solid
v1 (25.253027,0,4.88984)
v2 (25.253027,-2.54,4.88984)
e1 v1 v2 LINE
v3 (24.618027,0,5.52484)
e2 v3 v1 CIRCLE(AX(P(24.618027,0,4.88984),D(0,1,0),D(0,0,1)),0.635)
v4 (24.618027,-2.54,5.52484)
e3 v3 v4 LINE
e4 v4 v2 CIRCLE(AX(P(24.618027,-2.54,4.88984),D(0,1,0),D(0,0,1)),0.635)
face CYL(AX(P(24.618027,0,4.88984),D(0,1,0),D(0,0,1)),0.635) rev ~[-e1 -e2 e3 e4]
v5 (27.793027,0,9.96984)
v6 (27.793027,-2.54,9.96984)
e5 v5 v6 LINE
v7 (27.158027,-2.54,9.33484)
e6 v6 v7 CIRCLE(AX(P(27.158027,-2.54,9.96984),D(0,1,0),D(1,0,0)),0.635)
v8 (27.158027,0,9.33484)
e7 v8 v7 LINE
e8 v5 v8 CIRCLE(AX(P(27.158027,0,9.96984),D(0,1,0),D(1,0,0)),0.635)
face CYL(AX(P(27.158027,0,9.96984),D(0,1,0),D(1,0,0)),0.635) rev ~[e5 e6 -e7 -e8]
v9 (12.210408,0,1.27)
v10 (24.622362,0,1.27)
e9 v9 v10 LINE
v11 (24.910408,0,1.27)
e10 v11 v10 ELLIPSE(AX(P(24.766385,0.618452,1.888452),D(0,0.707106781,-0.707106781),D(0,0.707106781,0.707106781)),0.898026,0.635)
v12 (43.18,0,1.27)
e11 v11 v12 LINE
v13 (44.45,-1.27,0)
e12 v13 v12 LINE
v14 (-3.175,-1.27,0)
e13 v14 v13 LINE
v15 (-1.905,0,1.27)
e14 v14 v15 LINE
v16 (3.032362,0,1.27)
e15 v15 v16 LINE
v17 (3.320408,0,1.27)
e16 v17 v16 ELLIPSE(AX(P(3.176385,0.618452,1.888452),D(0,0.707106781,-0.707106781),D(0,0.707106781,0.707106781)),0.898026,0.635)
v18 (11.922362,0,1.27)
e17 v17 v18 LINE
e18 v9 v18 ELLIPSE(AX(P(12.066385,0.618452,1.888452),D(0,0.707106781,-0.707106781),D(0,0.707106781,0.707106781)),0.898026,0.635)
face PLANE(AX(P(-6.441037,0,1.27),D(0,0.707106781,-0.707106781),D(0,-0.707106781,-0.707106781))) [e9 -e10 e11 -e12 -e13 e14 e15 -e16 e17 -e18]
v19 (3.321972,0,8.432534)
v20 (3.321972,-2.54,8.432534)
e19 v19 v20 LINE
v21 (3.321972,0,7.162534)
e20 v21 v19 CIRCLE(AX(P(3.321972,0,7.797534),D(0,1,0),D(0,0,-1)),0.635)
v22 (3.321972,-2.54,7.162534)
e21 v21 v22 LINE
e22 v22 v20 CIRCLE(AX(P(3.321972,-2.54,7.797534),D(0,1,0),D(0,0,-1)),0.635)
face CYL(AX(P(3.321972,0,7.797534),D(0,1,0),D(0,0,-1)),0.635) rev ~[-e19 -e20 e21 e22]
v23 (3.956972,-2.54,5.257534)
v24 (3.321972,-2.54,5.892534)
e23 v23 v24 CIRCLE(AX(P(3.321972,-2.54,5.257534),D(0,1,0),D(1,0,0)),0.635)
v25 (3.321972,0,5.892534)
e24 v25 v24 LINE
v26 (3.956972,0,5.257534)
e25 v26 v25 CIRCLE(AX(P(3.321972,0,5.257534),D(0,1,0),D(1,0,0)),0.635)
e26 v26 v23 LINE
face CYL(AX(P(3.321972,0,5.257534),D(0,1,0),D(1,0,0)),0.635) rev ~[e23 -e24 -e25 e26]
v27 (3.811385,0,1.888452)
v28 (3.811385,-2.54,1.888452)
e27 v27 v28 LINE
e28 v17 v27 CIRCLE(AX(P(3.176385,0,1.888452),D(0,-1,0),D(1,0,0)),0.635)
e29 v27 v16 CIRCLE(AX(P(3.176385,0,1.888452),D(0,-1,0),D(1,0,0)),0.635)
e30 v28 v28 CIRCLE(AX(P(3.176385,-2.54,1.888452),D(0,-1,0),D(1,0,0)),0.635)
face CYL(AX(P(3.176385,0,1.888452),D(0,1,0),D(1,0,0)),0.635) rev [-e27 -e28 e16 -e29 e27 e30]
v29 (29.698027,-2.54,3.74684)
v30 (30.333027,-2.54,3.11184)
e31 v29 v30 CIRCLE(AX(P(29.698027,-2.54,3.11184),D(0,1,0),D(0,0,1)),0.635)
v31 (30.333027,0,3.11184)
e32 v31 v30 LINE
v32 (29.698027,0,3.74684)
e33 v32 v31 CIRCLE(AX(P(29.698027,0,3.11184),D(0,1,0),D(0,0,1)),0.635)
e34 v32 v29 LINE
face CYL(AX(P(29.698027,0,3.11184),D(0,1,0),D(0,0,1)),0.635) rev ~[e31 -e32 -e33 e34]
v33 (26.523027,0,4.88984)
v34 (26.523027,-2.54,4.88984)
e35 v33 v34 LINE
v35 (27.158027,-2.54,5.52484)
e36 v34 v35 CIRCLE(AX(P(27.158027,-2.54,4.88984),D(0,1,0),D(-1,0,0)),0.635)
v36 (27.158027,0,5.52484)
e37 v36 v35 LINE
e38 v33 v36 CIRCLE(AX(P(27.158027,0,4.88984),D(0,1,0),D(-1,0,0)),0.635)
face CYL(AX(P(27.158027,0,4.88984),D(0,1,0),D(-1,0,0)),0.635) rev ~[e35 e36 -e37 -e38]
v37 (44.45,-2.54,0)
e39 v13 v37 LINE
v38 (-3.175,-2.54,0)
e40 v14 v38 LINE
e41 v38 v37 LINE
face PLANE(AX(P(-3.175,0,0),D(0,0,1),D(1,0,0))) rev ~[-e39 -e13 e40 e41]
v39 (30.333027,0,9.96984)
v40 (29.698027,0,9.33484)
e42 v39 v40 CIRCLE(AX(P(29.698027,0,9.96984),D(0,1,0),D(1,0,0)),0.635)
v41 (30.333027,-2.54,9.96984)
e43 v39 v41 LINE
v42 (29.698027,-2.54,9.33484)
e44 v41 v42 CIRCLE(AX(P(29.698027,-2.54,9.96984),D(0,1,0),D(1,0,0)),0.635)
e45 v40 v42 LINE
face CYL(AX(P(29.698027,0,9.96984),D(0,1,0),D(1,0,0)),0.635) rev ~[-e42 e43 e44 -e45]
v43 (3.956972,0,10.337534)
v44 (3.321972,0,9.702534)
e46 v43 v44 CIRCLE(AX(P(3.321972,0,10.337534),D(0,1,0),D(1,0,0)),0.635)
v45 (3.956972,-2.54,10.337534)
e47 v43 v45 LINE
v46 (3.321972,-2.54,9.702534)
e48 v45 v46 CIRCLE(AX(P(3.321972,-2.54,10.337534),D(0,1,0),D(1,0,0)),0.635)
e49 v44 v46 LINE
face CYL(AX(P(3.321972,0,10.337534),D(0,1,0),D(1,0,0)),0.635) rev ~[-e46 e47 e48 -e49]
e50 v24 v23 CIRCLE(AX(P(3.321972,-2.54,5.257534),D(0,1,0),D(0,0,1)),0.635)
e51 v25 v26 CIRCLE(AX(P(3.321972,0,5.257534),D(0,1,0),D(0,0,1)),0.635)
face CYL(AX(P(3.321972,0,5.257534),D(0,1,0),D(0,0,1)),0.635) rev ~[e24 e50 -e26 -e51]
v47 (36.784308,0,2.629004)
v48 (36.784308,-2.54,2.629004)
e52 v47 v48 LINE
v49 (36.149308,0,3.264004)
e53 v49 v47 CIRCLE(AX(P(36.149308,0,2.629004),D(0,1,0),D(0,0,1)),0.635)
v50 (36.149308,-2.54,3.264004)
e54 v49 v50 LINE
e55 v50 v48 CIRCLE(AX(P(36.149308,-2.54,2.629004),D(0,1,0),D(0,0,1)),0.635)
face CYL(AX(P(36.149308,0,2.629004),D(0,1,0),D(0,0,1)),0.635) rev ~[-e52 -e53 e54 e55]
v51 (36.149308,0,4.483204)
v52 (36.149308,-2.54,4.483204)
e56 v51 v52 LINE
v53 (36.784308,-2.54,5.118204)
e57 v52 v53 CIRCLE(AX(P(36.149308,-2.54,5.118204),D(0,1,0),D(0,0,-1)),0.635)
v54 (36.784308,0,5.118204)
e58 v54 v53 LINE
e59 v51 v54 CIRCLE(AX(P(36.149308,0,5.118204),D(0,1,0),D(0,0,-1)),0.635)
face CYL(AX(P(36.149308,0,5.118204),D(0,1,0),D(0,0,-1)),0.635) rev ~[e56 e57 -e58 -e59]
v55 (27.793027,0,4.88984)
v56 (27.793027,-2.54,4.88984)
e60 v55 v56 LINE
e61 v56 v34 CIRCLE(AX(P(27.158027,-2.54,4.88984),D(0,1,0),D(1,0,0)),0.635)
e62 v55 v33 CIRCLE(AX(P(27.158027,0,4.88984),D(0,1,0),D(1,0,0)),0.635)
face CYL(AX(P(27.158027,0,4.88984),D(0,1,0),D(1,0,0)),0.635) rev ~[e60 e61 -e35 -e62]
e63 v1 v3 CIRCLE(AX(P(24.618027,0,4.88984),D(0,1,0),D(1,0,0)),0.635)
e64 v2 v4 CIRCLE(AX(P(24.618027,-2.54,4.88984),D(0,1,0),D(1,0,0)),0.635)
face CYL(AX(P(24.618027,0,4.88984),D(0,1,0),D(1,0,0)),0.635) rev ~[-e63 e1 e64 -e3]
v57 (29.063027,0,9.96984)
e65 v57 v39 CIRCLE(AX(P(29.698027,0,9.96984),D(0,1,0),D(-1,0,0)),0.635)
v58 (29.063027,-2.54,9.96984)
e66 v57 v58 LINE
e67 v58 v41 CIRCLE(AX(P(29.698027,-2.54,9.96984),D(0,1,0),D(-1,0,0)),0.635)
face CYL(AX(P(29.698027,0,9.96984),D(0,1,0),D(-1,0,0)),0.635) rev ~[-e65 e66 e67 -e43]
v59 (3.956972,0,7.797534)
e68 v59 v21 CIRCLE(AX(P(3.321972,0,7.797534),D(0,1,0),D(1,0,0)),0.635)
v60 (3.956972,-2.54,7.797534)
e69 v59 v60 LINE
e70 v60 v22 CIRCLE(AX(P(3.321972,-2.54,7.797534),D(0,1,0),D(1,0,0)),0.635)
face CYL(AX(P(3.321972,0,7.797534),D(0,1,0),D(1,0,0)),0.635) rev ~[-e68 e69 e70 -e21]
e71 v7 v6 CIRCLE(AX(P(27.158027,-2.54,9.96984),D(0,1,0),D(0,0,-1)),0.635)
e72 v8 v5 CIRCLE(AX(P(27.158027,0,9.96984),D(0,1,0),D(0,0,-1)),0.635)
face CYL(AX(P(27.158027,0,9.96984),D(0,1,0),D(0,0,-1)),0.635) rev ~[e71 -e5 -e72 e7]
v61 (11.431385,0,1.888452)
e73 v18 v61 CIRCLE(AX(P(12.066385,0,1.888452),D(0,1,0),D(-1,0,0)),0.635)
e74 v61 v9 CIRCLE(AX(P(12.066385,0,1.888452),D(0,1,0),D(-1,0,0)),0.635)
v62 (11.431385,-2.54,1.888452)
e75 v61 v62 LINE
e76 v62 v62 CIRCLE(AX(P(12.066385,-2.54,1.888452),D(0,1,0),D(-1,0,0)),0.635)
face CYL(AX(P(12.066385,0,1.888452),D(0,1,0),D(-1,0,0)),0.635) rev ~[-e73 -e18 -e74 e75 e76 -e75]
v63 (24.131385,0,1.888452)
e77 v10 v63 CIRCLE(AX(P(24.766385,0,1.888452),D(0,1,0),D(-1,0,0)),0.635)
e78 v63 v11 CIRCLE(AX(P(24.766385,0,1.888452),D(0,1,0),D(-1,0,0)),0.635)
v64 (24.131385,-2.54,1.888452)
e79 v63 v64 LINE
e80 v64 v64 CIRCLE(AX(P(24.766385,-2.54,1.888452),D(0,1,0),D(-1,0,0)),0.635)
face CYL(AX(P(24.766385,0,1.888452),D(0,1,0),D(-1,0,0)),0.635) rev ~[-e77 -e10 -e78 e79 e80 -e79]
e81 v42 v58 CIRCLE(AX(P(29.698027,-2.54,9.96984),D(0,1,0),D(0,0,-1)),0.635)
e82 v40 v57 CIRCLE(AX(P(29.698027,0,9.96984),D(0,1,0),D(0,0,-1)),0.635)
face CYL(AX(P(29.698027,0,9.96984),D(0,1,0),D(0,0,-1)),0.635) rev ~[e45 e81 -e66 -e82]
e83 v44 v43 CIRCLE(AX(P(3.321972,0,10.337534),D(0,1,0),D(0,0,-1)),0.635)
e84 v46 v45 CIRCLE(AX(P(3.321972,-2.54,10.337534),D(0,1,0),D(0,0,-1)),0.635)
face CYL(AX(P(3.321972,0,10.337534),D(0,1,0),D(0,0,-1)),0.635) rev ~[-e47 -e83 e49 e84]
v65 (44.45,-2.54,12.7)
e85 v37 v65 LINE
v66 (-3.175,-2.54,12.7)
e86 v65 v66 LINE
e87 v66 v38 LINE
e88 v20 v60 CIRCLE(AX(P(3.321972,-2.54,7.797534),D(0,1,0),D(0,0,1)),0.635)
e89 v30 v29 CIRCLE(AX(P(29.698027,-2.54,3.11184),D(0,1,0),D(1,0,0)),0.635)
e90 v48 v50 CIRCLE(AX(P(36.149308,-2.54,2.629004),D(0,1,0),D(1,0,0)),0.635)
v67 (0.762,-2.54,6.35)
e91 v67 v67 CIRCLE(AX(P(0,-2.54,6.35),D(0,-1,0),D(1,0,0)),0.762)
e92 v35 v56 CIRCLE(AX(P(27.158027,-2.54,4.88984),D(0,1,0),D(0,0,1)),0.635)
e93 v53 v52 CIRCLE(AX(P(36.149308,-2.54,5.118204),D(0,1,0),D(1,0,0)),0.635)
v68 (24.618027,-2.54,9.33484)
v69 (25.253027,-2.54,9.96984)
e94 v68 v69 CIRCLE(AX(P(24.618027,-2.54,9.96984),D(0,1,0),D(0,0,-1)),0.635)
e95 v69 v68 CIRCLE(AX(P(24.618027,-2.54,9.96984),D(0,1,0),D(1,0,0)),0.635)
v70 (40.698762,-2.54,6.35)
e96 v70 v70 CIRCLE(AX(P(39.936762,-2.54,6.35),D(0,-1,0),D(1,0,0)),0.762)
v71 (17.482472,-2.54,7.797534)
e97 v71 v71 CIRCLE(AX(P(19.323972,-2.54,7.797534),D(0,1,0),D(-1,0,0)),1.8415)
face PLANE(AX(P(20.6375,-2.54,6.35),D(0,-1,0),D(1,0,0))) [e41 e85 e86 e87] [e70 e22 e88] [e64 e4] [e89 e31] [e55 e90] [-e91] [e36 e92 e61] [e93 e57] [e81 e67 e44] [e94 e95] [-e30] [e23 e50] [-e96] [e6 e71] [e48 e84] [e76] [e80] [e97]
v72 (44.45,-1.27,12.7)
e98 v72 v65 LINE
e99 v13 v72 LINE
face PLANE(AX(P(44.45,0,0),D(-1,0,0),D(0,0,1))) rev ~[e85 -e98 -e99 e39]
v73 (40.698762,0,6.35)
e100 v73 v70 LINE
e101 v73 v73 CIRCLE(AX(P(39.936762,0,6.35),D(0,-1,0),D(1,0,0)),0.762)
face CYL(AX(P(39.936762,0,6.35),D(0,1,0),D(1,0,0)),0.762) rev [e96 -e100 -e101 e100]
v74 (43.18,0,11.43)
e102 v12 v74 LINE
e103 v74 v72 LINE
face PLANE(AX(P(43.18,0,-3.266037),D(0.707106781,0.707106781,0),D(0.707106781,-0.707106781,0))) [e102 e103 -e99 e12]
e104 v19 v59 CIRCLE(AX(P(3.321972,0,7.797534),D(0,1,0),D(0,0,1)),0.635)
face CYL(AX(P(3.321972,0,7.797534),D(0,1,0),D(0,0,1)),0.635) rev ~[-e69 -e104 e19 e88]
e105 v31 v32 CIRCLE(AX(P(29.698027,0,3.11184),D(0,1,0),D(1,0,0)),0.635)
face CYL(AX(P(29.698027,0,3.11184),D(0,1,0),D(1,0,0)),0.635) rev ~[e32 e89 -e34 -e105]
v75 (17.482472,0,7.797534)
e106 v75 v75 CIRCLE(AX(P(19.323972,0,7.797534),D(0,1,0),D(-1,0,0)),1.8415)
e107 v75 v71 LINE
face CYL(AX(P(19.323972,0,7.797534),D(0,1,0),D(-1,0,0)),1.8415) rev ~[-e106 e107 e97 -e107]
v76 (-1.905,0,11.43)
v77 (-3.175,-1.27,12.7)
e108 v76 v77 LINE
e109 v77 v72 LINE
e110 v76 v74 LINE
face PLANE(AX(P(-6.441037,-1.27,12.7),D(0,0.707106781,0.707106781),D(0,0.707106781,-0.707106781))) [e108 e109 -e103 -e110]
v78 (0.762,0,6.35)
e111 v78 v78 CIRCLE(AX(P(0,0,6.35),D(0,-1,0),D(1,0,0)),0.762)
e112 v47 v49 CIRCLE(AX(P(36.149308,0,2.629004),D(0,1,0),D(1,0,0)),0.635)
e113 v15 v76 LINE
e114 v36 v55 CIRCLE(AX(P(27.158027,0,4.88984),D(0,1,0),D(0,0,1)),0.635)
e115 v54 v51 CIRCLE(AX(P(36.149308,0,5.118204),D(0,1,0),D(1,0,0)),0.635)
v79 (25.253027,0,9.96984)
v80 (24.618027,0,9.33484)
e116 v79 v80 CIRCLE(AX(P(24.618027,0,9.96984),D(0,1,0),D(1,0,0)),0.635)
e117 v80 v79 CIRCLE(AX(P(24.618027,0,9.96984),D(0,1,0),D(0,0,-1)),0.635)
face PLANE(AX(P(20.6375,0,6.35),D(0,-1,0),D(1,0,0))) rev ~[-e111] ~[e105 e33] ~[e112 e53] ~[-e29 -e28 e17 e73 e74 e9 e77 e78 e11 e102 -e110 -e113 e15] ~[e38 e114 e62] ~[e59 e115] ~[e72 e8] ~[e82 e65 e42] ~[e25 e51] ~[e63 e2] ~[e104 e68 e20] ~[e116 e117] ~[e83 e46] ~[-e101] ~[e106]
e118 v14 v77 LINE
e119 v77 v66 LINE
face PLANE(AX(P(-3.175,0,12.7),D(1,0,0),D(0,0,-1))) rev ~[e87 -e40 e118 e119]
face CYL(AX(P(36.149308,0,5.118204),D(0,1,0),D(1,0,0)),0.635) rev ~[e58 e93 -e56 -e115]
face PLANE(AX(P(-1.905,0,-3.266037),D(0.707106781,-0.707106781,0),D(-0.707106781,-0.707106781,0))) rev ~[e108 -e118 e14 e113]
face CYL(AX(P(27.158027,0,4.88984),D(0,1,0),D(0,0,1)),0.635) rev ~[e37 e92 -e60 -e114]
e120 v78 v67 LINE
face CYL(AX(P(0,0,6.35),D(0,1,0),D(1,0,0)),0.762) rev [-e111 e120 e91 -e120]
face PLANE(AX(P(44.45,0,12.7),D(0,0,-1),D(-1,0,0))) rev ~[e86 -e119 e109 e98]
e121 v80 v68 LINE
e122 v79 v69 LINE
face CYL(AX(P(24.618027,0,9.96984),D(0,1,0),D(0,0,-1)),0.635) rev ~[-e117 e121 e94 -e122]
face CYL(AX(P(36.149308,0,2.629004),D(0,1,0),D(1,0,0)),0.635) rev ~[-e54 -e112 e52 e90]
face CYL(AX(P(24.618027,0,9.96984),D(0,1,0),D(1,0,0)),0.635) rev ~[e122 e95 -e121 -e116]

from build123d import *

# Parameters (mm, degrees)
F0_R        = 0.635
F0_R_2      = 0.762
F1_DEPTH    = 2.54
F2_T1_DEPTH = 19.2320747894
F2_T3_DEPTH = 54.1570747894


# Not quite as in the source:
# - a fillet or chamfer that OpenCascade refuses, or shapes differently, is made with other operations: its cross-section is extruded or revolved along the edge and cut away or added


with BuildPart() as f1:
    # F0 (on Front) → F1 (new body)
    with BuildSketch(Plane.XZ):
        Polygon((44.45, 12.7), (0, 12.7), (-3.175, 12.7), (-3.175, 0), (0, 0), (44.45, 0), align=None)
        with Locations((3.1763850711, 1.8884516321)):
            Circle(F0_R, mode=Mode.SUBTRACT)
        with BuildLine():
            ThreePointArc((12.7013850711, 1.8884516321), (12.0663850711, 1.2534516321), (11.4313850711, 1.8884516321))
            ThreePointArc((11.4313850711, 1.8884516321), (12.0663850711, 2.5234516321), (12.7013850711, 1.8884516321))
        make_face(mode=Mode.SUBTRACT)
        with Locations((0, 6.35)):
            Circle(F0_R_2, mode=Mode.SUBTRACT)
        with BuildLine():
            ThreePointArc((3.9569724428, 5.2575343288), (2.8729596367, 4.8085215228), (3.3219724428, 5.8925343288))
            ThreePointArc((3.3219724428, 5.8925343288), (3.7709852488, 5.7065471349), (3.9569724428, 5.2575343288))
        make_face(mode=Mode.SUBTRACT)
        with BuildLine():
            ThreePointArc((25.4013850711, 1.8884516321), (24.7663850711, 1.2534516321), (24.1313850711, 1.8884516321))
            ThreePointArc((24.1313850711, 1.8884516321), (24.7663850711, 2.5234516321), (25.4013850711, 1.8884516321))
        make_face(mode=Mode.SUBTRACT)
        with BuildLine():
            ThreePointArc((30.3330272979, 3.1118398262), (29.2490144918, 2.6628270202), (29.6980272979, 3.7468398262))
            ThreePointArc((29.6980272979, 3.7468398262), (30.1470401039, 3.5608526323), (30.3330272979, 3.1118398262))
        make_face(mode=Mode.SUBTRACT)
        with BuildLine():
            ThreePointArc((36.7843080854, 2.629004186), (35.7002952794, 2.17999138), (36.1493080854, 3.264004186))
            ThreePointArc((36.1493080854, 3.264004186), (36.5983208915, 3.0780169921), (36.7843080854, 2.629004186))
        make_face(mode=Mode.SUBTRACT)
        with BuildLine():
            ThreePointArc((25.2530272979, 4.8898398262), (24.1690144918, 4.4408270202), (24.6180272979, 5.5248398262))
            ThreePointArc((24.6180272979, 5.5248398262), (25.0670401039, 5.3388526323), (25.2530272979, 4.8898398262))
        make_face(mode=Mode.SUBTRACT)
        with BuildLine():
            ThreePointArc((27.7930272979, 4.8898398262), (27.1580272979, 4.2548398262), (26.5230272979, 4.8898398262))
            ThreePointArc((26.5230272979, 4.8898398262), (26.7090144918, 5.3388526323), (27.1580272979, 5.5248398262))
            ThreePointArc((27.1580272979, 5.5248398262), (27.6070401039, 5.3388526323), (27.7930272979, 4.8898398262))
        make_face(mode=Mode.SUBTRACT)
        with BuildLine():
            ThreePointArc((36.7843080854, 5.118204186), (36.5983208915, 4.66919138), (36.1493080854, 4.483204186))
            ThreePointArc((36.1493080854, 4.483204186), (35.7002952794, 5.5672169921), (36.7843080854, 5.118204186))
        make_face(mode=Mode.SUBTRACT)
        with Locations((39.9367623031, 6.35)):
            Circle(F0_R_2, mode=Mode.SUBTRACT)
        with BuildLine():
            ThreePointArc((3.3219724428, 7.1625343288), (2.6869724428, 7.7975343288), (3.3219724428, 8.4325343288))
            ThreePointArc((3.3219724428, 8.4325343288), (3.7709852488, 8.2465471349), (3.9569724428, 7.7975343288))
            ThreePointArc((3.9569724428, 7.7975343288), (3.7709852488, 7.3485215228), (3.3219724428, 7.1625343288))
        make_face(mode=Mode.SUBTRACT)
        with BuildLine():
            ThreePointArc((21.1654724428, 7.7975343288), (19.3239724428, 5.9560343288), (17.4824724428, 7.7975343288))
            ThreePointArc((17.4824724428, 7.7975343288), (19.3239724428, 9.6390343288), (21.1654724428, 7.7975343288))
        make_face(mode=Mode.SUBTRACT)
        with BuildLine():
            ThreePointArc((3.3219724428, 9.7025343288), (2.8729596367, 10.7865471349), (3.9569724428, 10.3375343288))
            ThreePointArc((3.9569724428, 10.3375343288), (3.7709852488, 9.8885215228), (3.3219724428, 9.7025343288))
        make_face(mode=Mode.SUBTRACT)
        with BuildLine():
            ThreePointArc((25.2530272979, 9.9698398262), (25.0670401039, 9.5208270202), (24.6180272979, 9.3348398262))
            ThreePointArc((24.6180272979, 9.3348398262), (24.1690144918, 10.4188526323), (25.2530272979, 9.9698398262))
        make_face(mode=Mode.SUBTRACT)
        with BuildLine():
            ThreePointArc((27.7930272979, 9.9698398262), (27.6070401039, 9.5208270202), (27.1580272979, 9.3348398262))
            ThreePointArc((27.1580272979, 9.3348398262), (26.7090144918, 10.4188526323), (27.7930272979, 9.9698398262))
        make_face(mode=Mode.SUBTRACT)
        with BuildLine():
            ThreePointArc((29.6980272979, 9.3348398262), (29.2490144918, 9.5208270202), (29.0630272979, 9.9698398262))
            ThreePointArc((29.0630272979, 9.9698398262), (29.6980272979, 10.6048398262), (30.3330272979, 9.9698398262))
            ThreePointArc((30.3330272979, 9.9698398262), (30.1470401039, 9.5208270202), (29.6980272979, 9.3348398262))
        make_face(mode=Mode.SUBTRACT)
    extrude(amount=F1_DEPTH)

    # F2: chamfer of 1.27 on 4 edges, made by hand

    # F2_s2 → F2_t1 (cut)
    with BuildSketch(Plane.XY.offset(-3.2660373947)):
        Polygon((43.18, 0), (44.45, -1.27), (44.45, 0), align=None)
        Polygon((-1.905, 0), (-3.175, -1.27), (-3.175, 0), align=None)
    extrude(amount=F2_T1_DEPTH, mode=Mode.SUBTRACT)

    # F2_s4 → F2_t3 (cut)
    with BuildSketch(Plane.YZ.offset(-6.4410373947)):
        Polygon((-1.27, 12.7), (0, 11.43), (0, 12.7), align=None)
        Polygon((0, 1.27), (-1.27, 0), (0, 0), align=None)
    extrude(amount=F2_T3_DEPTH, mode=Mode.SUBTRACT)


solid = f1.part
